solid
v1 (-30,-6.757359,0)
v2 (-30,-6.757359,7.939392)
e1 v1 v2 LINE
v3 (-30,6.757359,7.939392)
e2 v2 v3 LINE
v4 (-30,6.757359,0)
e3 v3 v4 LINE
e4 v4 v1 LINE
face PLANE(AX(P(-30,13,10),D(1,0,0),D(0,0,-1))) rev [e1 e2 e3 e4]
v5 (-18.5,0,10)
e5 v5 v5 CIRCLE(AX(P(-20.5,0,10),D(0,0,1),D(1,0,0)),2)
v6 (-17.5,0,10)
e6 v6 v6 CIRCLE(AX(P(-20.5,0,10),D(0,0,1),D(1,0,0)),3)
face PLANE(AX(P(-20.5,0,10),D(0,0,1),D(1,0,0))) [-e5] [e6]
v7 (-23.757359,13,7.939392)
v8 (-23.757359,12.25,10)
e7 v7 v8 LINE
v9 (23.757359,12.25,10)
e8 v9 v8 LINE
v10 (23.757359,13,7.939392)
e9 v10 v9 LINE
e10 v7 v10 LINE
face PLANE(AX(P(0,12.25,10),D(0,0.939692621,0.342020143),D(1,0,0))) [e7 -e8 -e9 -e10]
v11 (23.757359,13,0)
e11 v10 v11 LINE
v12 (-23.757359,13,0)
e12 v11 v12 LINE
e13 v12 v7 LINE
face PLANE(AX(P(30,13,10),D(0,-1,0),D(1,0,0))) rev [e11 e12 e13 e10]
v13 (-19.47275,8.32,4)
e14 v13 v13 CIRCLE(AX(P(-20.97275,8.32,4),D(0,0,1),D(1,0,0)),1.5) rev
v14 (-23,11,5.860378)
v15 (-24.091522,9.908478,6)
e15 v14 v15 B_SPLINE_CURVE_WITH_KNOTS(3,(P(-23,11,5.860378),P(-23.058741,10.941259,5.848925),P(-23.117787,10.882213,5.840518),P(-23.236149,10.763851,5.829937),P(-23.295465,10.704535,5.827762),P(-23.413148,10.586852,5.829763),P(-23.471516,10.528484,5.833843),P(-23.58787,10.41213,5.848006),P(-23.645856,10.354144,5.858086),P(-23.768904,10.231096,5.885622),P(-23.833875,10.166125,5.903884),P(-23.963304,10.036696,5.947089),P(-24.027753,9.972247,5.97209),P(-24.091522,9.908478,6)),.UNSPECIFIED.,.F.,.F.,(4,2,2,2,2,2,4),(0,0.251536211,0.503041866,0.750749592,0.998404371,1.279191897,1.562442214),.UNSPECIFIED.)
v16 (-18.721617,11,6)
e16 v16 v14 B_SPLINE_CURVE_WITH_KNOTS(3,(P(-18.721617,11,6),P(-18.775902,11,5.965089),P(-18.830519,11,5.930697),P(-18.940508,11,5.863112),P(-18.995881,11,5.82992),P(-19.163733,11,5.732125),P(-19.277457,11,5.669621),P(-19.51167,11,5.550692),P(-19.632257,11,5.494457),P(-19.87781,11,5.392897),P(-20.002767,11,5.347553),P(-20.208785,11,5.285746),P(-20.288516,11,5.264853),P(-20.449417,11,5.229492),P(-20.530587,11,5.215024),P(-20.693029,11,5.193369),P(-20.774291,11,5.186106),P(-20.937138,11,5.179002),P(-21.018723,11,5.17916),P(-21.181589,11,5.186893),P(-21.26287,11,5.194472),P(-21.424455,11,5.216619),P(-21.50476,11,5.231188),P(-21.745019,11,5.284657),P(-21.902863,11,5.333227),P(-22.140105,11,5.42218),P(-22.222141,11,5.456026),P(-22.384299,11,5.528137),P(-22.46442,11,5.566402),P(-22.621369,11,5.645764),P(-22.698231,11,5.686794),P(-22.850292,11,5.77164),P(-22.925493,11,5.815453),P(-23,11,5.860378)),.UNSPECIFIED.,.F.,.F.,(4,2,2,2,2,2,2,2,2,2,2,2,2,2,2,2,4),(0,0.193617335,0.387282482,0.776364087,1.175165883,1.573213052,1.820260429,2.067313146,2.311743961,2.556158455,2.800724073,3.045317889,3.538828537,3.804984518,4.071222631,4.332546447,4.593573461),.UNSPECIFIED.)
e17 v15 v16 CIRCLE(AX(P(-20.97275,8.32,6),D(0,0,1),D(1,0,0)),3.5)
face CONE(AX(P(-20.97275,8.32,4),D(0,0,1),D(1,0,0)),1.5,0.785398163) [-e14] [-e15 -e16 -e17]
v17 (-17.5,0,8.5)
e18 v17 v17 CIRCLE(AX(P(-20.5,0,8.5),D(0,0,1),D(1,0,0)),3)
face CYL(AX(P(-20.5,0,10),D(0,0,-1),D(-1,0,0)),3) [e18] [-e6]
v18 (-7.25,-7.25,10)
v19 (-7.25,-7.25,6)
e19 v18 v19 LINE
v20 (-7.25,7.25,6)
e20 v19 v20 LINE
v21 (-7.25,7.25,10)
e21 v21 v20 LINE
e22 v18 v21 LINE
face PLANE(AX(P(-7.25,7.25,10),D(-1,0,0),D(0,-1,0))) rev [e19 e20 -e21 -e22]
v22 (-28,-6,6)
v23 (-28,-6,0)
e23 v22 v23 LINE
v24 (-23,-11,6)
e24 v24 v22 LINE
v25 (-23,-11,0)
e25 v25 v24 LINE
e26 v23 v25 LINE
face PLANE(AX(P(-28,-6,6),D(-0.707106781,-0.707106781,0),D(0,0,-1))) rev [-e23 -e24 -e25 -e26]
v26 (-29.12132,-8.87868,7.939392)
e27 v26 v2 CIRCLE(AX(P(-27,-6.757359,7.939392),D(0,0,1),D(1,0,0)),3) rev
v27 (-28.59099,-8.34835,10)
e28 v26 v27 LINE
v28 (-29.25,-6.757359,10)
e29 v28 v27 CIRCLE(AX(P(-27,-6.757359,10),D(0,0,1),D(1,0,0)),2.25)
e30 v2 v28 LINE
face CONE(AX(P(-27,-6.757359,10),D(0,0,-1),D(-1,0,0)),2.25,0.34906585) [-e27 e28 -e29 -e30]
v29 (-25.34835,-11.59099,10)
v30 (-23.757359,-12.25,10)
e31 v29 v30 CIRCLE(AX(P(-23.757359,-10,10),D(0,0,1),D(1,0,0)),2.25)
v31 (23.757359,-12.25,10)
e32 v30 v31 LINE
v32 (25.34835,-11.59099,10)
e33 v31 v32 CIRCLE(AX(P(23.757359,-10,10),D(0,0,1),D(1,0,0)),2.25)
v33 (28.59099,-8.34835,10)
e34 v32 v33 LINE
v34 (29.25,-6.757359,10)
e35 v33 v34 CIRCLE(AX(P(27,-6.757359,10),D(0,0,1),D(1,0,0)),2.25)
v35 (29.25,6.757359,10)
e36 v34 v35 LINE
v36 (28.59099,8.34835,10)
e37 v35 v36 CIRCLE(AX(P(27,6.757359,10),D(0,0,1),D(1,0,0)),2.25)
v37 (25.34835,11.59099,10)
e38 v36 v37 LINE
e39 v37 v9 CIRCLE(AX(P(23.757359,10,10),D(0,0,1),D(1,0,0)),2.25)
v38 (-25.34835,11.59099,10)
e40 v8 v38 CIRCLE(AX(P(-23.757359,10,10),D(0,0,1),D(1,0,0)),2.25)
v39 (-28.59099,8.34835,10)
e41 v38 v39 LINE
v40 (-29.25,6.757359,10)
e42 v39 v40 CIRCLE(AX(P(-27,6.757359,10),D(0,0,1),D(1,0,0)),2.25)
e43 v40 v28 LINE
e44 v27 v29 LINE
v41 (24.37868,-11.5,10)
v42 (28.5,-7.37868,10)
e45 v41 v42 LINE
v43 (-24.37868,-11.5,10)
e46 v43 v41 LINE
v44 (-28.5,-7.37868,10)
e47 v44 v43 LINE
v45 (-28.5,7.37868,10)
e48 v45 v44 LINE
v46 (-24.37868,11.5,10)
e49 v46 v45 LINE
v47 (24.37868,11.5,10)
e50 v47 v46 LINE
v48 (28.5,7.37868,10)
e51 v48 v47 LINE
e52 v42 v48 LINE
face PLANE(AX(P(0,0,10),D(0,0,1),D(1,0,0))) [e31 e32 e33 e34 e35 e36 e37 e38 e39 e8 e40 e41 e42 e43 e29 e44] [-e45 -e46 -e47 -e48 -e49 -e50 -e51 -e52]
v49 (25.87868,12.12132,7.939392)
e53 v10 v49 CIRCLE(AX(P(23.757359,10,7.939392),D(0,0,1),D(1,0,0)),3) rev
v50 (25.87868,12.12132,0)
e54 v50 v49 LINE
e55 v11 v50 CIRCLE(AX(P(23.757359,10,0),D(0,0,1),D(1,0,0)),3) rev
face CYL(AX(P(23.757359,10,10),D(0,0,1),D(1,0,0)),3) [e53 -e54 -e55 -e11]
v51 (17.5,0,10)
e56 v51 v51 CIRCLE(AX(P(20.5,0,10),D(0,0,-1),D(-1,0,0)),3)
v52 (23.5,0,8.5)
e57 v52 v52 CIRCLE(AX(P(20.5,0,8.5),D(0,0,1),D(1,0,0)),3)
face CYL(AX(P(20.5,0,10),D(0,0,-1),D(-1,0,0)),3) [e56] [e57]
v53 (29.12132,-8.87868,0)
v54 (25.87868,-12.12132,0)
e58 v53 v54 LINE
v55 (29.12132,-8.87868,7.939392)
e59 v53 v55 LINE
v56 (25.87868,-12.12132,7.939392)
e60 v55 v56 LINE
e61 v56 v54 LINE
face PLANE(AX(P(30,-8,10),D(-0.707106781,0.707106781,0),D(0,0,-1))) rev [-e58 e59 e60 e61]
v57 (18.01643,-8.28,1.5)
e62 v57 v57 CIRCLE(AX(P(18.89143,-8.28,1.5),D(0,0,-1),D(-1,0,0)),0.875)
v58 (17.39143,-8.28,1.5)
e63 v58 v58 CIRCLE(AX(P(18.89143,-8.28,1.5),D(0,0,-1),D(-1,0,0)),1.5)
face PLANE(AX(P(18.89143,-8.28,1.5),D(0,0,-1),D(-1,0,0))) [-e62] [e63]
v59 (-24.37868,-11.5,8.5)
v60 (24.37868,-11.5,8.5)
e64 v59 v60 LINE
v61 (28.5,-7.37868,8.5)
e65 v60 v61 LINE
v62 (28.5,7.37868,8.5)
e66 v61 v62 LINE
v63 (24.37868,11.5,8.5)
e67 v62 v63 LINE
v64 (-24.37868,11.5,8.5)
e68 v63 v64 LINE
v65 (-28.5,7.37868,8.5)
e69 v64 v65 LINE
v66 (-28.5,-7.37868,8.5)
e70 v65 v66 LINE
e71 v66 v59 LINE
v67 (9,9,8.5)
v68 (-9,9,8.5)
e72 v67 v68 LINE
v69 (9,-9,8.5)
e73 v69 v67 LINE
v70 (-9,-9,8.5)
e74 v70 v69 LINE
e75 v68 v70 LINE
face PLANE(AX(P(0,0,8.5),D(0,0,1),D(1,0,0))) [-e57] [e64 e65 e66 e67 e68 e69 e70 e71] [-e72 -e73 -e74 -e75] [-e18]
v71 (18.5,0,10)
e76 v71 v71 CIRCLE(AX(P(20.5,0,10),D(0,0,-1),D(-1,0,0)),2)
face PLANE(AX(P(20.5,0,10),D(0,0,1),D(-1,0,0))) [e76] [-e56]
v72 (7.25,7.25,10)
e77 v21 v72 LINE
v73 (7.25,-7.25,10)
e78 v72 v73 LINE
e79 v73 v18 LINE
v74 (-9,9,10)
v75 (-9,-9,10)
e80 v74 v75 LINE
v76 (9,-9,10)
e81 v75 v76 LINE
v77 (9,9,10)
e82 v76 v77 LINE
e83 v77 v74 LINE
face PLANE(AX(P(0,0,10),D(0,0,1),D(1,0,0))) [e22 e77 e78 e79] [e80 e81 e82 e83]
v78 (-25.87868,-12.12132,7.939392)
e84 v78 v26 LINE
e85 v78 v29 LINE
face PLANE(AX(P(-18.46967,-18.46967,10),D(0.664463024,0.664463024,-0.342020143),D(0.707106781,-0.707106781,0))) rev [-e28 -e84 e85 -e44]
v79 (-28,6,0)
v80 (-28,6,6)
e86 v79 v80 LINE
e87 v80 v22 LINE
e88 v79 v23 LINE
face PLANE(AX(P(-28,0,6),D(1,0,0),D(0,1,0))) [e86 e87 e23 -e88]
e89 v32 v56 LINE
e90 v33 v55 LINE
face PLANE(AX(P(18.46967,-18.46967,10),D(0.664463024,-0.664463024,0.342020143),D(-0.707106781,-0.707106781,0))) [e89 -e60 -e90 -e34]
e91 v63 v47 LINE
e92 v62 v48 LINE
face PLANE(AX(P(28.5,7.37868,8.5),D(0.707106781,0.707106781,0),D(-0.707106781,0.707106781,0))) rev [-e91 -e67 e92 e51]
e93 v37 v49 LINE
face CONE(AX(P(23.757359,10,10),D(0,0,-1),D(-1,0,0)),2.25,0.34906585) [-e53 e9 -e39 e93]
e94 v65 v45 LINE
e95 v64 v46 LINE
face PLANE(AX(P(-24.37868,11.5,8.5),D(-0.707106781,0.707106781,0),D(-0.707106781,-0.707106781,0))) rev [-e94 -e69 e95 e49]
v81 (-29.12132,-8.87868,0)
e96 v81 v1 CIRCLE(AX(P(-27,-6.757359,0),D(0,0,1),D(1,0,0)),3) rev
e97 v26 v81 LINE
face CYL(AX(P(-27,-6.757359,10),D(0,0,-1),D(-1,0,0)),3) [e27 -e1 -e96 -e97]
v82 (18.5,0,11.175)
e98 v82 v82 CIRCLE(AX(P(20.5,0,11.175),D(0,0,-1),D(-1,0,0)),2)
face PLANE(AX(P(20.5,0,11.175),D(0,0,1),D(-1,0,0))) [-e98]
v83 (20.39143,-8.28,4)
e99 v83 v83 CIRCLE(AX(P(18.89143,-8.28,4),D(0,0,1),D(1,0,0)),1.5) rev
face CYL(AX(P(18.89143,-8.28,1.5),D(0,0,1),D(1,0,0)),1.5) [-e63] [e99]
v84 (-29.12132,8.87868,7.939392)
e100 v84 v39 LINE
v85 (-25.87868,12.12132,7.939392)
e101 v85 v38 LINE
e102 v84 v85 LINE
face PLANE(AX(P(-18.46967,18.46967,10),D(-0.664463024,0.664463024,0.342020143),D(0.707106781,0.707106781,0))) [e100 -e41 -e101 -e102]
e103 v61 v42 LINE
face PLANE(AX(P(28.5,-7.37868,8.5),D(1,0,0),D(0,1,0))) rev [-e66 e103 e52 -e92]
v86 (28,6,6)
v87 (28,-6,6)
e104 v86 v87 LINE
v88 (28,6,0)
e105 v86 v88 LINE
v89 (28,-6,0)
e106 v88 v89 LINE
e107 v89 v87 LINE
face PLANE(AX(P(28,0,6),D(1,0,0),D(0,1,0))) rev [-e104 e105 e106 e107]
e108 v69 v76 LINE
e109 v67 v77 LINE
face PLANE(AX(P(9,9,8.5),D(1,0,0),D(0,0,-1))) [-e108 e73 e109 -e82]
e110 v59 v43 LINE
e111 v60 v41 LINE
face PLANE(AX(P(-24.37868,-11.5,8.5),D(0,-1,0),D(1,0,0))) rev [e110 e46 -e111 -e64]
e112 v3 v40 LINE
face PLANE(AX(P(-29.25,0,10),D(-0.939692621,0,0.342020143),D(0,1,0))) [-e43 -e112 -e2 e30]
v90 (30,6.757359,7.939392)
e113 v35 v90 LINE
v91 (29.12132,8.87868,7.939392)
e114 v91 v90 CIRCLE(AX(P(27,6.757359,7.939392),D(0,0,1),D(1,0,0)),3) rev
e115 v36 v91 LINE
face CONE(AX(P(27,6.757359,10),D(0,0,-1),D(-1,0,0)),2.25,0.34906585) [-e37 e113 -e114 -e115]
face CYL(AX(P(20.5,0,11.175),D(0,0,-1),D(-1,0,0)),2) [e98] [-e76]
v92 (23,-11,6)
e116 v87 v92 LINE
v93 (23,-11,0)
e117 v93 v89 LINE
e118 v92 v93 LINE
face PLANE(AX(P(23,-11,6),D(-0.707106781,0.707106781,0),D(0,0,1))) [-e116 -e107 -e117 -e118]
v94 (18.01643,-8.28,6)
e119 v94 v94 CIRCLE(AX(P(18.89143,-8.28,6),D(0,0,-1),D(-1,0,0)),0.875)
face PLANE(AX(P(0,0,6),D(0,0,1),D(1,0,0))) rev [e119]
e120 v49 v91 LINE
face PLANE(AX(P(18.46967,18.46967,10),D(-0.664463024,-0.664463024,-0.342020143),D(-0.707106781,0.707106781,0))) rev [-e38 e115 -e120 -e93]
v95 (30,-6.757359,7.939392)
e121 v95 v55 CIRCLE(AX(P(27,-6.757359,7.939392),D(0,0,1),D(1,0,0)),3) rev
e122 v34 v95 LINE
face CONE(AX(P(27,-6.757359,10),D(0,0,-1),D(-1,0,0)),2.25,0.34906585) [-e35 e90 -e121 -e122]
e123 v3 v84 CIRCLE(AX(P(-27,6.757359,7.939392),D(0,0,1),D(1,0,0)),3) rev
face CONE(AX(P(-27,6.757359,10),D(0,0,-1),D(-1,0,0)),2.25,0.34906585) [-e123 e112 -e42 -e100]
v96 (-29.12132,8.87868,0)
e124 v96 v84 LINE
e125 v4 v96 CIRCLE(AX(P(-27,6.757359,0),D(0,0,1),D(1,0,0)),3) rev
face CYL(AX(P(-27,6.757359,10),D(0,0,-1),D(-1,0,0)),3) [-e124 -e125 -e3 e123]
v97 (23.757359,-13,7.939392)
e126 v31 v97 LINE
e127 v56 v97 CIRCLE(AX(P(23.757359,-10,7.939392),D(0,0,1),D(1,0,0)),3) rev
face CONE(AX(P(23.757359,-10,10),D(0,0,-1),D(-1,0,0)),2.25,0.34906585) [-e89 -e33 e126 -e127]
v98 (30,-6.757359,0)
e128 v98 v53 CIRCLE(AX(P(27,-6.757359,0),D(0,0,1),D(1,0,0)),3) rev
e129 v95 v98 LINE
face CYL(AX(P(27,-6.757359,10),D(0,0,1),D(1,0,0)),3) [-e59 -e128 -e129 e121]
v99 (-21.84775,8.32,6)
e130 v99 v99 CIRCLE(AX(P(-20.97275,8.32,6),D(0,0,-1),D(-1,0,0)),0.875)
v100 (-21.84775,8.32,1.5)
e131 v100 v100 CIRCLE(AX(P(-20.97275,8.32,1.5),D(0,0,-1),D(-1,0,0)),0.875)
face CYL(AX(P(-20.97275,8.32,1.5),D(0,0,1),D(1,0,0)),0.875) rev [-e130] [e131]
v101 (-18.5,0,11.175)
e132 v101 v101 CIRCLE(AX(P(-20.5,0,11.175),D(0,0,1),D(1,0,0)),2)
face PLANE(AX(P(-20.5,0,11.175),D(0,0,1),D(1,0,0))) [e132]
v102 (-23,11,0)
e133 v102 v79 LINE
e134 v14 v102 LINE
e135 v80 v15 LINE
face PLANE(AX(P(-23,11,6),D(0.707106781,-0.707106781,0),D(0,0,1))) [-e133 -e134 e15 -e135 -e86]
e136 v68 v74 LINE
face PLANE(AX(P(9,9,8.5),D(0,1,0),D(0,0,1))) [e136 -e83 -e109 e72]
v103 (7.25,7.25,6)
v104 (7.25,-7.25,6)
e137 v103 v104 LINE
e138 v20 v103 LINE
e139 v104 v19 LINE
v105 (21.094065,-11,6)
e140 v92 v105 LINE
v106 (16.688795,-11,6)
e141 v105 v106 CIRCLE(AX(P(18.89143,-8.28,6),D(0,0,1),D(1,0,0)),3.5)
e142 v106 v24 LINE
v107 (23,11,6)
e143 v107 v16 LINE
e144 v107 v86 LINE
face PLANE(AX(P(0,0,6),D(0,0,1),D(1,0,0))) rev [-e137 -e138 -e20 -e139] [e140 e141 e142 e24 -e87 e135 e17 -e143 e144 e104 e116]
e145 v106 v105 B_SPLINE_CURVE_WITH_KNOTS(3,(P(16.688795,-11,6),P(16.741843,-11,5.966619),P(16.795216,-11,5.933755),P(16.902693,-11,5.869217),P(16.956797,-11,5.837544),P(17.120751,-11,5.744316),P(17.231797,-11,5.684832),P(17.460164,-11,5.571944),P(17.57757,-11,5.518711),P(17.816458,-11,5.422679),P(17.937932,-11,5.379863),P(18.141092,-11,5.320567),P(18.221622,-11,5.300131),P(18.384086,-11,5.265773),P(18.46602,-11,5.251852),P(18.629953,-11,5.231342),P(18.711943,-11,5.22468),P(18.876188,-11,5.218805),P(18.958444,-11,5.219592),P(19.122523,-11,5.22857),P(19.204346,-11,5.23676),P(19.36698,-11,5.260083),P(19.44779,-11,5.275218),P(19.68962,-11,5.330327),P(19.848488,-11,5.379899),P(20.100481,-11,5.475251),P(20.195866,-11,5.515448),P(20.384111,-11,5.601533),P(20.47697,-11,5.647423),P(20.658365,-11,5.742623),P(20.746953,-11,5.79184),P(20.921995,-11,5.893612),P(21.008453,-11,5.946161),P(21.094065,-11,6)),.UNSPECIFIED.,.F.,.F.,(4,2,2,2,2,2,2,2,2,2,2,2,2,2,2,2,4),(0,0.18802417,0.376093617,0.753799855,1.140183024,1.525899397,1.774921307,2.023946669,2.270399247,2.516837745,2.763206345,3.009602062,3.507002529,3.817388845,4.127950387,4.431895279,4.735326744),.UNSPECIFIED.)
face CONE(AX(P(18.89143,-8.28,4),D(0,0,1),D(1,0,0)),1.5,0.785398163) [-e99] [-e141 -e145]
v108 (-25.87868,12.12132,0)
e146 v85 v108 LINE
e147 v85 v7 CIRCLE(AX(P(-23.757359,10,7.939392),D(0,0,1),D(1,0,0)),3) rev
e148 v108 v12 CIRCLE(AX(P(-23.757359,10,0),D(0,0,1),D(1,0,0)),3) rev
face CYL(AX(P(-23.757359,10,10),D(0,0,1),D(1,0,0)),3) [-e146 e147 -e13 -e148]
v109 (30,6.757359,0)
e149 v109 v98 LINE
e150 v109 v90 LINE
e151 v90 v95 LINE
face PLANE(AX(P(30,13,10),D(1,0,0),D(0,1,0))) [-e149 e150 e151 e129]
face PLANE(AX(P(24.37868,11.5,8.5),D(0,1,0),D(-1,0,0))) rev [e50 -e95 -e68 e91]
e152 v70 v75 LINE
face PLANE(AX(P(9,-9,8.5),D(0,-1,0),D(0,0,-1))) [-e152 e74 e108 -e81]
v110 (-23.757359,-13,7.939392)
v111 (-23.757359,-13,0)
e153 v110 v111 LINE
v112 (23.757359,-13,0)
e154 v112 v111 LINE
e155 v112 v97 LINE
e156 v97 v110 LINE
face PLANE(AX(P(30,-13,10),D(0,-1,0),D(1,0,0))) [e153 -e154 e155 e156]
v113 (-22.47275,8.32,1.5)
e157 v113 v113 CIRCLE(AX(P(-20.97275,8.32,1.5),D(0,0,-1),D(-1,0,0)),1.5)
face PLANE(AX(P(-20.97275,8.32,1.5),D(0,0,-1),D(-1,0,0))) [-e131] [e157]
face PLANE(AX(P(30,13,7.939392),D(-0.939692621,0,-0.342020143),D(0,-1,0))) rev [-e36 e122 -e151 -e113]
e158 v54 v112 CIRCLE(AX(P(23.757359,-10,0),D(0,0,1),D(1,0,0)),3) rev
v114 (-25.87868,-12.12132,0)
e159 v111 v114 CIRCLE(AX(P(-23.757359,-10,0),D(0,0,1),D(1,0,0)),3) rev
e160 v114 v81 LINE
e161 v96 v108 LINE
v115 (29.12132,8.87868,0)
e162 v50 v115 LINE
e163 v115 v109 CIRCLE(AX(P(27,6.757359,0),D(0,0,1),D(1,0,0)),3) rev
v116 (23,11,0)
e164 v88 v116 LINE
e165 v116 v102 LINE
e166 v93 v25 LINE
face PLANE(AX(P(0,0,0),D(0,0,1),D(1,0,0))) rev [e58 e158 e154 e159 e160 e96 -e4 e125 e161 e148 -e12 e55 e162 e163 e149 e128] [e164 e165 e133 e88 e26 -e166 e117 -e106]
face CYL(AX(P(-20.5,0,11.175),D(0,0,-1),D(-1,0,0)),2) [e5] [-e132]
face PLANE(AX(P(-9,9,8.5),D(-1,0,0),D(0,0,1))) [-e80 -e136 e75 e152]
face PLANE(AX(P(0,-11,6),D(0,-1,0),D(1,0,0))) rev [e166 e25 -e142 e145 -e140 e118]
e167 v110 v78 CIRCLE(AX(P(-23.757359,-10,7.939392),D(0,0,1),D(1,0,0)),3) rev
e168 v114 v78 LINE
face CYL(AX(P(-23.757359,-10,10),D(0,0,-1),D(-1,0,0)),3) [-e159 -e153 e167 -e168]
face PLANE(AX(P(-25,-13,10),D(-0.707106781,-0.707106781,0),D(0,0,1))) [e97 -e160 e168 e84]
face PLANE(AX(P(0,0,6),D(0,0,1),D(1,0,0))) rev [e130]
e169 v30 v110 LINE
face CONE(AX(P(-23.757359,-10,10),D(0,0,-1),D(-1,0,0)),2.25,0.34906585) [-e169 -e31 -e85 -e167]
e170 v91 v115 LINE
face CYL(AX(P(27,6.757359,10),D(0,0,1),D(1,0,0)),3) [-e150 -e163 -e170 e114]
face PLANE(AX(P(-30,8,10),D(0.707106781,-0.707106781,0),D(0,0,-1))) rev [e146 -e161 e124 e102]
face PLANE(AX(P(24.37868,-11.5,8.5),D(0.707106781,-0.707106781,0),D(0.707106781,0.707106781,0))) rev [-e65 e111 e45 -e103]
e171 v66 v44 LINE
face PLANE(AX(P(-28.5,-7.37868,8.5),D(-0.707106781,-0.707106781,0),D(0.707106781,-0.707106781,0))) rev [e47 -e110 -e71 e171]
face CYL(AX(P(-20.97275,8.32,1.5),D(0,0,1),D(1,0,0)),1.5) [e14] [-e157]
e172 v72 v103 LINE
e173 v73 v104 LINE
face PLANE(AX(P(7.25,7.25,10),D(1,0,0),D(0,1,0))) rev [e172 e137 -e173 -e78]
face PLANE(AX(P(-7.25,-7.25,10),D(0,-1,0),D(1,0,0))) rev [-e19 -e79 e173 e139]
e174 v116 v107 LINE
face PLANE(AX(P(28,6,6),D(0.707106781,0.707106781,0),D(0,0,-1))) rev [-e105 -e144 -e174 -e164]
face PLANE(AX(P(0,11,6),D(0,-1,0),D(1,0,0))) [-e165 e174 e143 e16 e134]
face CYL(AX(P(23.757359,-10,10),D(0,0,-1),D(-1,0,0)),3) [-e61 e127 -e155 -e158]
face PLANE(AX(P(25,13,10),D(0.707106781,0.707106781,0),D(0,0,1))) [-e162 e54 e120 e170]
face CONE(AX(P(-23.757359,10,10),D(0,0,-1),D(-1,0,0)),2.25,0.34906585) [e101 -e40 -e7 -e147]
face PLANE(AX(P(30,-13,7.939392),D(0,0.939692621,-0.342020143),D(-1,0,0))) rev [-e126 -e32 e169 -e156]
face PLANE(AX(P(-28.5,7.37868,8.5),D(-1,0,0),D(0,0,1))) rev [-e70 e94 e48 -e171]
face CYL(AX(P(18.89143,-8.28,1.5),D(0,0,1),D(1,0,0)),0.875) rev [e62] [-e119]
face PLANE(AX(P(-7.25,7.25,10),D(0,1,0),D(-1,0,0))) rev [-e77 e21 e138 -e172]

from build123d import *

# Parameters (mm, degrees)
SKETCH1_W           = 60
SKETCH1_H           = 26
BOSS_EXTRUDE2_DEPTH = 10
SKETCH1_5_W         = 56
SKETCH1_5_H         = 22
CUT_EXTRUDE1_DEPTH  = 6
CHAMFER1_SIZE       = 5
SKETCH2_W           = 14.5
SKETCH2_H           = 14.5
CUT_EXTRUDE2_DEPTH  = 34.241540277
CHAMFER2_SIZE       = 5
SKETCH3_W           = 18
SKETCH3_H           = 18
CUT_EXTRUDE3_DEPTH  = 1.5
SKETCH4_R           = 3
BOSS_EXTRUDE4_DEPTH = 1.5
SKETCH5_R           = 2
BOSS_EXTRUDE5_DEPTH = 1.175
SKETCH6_R           = 1.5
SKETCH6_R_2         = 0.875
BOSS_EXTRUDE6_DEPTH = 4.5
CHAMFER3_SIZE       = 2
FILLET1_R           = 3
CHAMFER4_SIZE       = 0.75
CHAMFER4_SIZE2      = 2.060608065


with BuildPart() as part:
    # Sketch1 → Boss-Extrude2 (new body)
    with BuildSketch(Plane.XY):
        Rectangle(SKETCH1_W, SKETCH1_H)
    extrude(amount=BOSS_EXTRUDE2_DEPTH)

    # Sketch1<5> → Cut-Extrude1 (cut)
    with BuildSketch(Plane.XY):
        Rectangle(SKETCH1_5_W, SKETCH1_5_H)
    extrude(amount=CUT_EXTRUDE1_DEPTH, mode=Mode.SUBTRACT)

    # Chamfer1
    chamfer1_edges = [part.edges().sort_by_distance(p)[0] for p in [
        (28, 11, 3),
        (-28, 11, 3),
        (-28, -11, 3),
        (28, -11, 3),
    ]]
    chamfer(chamfer1_edges, length=CHAMFER1_SIZE)

    # Sketch2 → Cut-Extrude2 (cut, through all)
    with BuildSketch(Plane(origin=(0, 0, 6), x_dir=(-1, 0, 0), z_dir=(0, 0, -1))):
        Rectangle(SKETCH2_W, SKETCH2_H)
    extrude(amount=-CUT_EXTRUDE2_DEPTH, mode=Mode.SUBTRACT)

    # Chamfer2
    chamfer2_edges = [part.edges().sort_by_distance(p)[0] for p in [
        (30, 13, 5),
        (30, -13, 5),
        (-30, -13, 5),
        (-30, 13, 5),
    ]]
    chamfer(chamfer2_edges, length=CHAMFER2_SIZE)

    # Sketch3 → Cut-Extrude3 (cut)
    with BuildSketch(Plane.XY.offset(10)):
        Polygon((-28.5, 7.378679656), (-28.5, -7.378679656), (-24.378679656, -11.5), (24.378679656, -11.5), (28.5, -7.378679656), (28.5, 7.378679656), (24.378679656, 11.5), (-24.378679656, 11.5), align=None)
        Rectangle(SKETCH3_W, SKETCH3_H, mode=Mode.SUBTRACT)
    extrude(amount=-CUT_EXTRUDE3_DEPTH, mode=Mode.SUBTRACT)

    # Sketch4 → Boss-Extrude4 (add)
    with BuildSketch(Plane.XY.offset(8.5)):
        with Locations((-20.5, 0)):
            Circle(SKETCH4_R)
    boss_extrude4 = extrude(amount=BOSS_EXTRUDE4_DEPTH)

    # Sketch5 → Boss-Extrude5 (add)
    with BuildSketch(Plane.XY.offset(10)):
        with Locations((-20.5, 0)):
            Circle(SKETCH5_R)
    boss_extrude5 = extrude(amount=BOSS_EXTRUDE5_DEPTH)

    # Mirror1: Boss-Extrude4, Boss-Extrude5 across plane
    add(boss_extrude4.mirror(Plane(origin=(0, 0, 0), x_dir=(0, 0, 1), z_dir=(1, 0, 0))))
    add(boss_extrude5.mirror(Plane(origin=(0, 0, 0), x_dir=(0, 0, 1), z_dir=(1, 0, 0))))

    # Sketch6 → Boss-Extrude6 (add)
    # profile 1 of 2: a face of its own
    with BuildSketch(Plane(origin=(0, 0, 6), x_dir=(-1, 0, 0), z_dir=(0, 0, -1))):
        with Locations(Location((-18.891430022, -8.28, 0), (0, 0, 180))):
            Circle(SKETCH6_R)
        with Locations((-18.891430022, -8.28)):
            Circle(SKETCH6_R_2, mode=Mode.SUBTRACT)
    # profile 2 of 2: a face of its own
    with BuildSketch(Plane(origin=(0, 0, 6), x_dir=(-1, 0, 0), z_dir=(0, 0, -1))):
        with Locations(Location((20.972750365, 8.32, 0), (0, 0, 180))):
            Circle(SKETCH6_R)
        with Locations((20.972750365, 8.32)):
            Circle(SKETCH6_R_2, mode=Mode.SUBTRACT)
    extrude(amount=BOSS_EXTRUDE6_DEPTH)

    # Chamfer3
    # the kernel refuses this chamfer: 2 mm, written as the material it adds along each edge
    with BuildSketch(Plane(origin=(18.891430022, -8.28, 6), x_dir=(1, 0, 0), z_dir=(0, 1, 0))) as chamfer3_piece_1:
        Polygon((1.5 + CHAMFER3_SIZE, 0), (1.5, CHAMFER3_SIZE), (1.5, 0), align=None)
    revolve(axis=Axis((18.891430022, -8.28, 6), (0, 0, -1)))
    with BuildSketch(Plane(origin=(-20.972750365, 8.32, 6), x_dir=(1, 0, 0), z_dir=(0, 1, 0))) as chamfer3_piece_2:
        Polygon((1.5 + CHAMFER3_SIZE, 0), (1.5, CHAMFER3_SIZE), (1.5, 0), align=None)
    revolve(axis=Axis((-20.972750365, 8.32, 6), (0, 0, -1)))

    # Fillet1
    fillet1_edges = [part.edges().sort_by_distance(p)[0] for p in [
        (25, -13, 5),
        (-25, -13, 5),
        (-30, 8, 5),
        (-30, -8, 5),
        (30, 8, 5),
        (30, -8, 5),
        (-25, 13, 5),
        (25, 13, 5),
    ]]
    fillet(fillet1_edges, radius=FILLET1_R)

    # Chamfer4
    chamfer4_edges = [part.edges().sort_by_distance(p)[0] for p in [
        (30, 0, 10),
        (-30, 0, 10),
        (-27.5, -10.5, 10),
        (0, -13, 10),
        (27.5, -10.5, 10),
        (27.5, 10.5, 10),
        (0, 13, 10),
        (-27.5, 10.5, 10),
        (29.771638598, -7.90540961, 10),
        (24.90540961, -12.771638598, 10),
        (-24.90540961, -12.771638598, 10),
        (-29.771638598, -7.90540961, 10),
        (-29.771638598, 7.90540961, 10),
        (-24.90540961, 12.771638598, 10),
        (24.90540961, 12.771638598, 10),
        (29.771638598, 7.90540961, 10),
    ]]
    chamfer4_side = [part.faces().sort_by_distance(p)[0] for p in [
        (-29.346088691, 0, 10),
    ]]
    chamfer(chamfer4_edges, length=CHAMFER4_SIZE, length2=CHAMFER4_SIZE2, reference=chamfer4_side[0])


solid = part.part
